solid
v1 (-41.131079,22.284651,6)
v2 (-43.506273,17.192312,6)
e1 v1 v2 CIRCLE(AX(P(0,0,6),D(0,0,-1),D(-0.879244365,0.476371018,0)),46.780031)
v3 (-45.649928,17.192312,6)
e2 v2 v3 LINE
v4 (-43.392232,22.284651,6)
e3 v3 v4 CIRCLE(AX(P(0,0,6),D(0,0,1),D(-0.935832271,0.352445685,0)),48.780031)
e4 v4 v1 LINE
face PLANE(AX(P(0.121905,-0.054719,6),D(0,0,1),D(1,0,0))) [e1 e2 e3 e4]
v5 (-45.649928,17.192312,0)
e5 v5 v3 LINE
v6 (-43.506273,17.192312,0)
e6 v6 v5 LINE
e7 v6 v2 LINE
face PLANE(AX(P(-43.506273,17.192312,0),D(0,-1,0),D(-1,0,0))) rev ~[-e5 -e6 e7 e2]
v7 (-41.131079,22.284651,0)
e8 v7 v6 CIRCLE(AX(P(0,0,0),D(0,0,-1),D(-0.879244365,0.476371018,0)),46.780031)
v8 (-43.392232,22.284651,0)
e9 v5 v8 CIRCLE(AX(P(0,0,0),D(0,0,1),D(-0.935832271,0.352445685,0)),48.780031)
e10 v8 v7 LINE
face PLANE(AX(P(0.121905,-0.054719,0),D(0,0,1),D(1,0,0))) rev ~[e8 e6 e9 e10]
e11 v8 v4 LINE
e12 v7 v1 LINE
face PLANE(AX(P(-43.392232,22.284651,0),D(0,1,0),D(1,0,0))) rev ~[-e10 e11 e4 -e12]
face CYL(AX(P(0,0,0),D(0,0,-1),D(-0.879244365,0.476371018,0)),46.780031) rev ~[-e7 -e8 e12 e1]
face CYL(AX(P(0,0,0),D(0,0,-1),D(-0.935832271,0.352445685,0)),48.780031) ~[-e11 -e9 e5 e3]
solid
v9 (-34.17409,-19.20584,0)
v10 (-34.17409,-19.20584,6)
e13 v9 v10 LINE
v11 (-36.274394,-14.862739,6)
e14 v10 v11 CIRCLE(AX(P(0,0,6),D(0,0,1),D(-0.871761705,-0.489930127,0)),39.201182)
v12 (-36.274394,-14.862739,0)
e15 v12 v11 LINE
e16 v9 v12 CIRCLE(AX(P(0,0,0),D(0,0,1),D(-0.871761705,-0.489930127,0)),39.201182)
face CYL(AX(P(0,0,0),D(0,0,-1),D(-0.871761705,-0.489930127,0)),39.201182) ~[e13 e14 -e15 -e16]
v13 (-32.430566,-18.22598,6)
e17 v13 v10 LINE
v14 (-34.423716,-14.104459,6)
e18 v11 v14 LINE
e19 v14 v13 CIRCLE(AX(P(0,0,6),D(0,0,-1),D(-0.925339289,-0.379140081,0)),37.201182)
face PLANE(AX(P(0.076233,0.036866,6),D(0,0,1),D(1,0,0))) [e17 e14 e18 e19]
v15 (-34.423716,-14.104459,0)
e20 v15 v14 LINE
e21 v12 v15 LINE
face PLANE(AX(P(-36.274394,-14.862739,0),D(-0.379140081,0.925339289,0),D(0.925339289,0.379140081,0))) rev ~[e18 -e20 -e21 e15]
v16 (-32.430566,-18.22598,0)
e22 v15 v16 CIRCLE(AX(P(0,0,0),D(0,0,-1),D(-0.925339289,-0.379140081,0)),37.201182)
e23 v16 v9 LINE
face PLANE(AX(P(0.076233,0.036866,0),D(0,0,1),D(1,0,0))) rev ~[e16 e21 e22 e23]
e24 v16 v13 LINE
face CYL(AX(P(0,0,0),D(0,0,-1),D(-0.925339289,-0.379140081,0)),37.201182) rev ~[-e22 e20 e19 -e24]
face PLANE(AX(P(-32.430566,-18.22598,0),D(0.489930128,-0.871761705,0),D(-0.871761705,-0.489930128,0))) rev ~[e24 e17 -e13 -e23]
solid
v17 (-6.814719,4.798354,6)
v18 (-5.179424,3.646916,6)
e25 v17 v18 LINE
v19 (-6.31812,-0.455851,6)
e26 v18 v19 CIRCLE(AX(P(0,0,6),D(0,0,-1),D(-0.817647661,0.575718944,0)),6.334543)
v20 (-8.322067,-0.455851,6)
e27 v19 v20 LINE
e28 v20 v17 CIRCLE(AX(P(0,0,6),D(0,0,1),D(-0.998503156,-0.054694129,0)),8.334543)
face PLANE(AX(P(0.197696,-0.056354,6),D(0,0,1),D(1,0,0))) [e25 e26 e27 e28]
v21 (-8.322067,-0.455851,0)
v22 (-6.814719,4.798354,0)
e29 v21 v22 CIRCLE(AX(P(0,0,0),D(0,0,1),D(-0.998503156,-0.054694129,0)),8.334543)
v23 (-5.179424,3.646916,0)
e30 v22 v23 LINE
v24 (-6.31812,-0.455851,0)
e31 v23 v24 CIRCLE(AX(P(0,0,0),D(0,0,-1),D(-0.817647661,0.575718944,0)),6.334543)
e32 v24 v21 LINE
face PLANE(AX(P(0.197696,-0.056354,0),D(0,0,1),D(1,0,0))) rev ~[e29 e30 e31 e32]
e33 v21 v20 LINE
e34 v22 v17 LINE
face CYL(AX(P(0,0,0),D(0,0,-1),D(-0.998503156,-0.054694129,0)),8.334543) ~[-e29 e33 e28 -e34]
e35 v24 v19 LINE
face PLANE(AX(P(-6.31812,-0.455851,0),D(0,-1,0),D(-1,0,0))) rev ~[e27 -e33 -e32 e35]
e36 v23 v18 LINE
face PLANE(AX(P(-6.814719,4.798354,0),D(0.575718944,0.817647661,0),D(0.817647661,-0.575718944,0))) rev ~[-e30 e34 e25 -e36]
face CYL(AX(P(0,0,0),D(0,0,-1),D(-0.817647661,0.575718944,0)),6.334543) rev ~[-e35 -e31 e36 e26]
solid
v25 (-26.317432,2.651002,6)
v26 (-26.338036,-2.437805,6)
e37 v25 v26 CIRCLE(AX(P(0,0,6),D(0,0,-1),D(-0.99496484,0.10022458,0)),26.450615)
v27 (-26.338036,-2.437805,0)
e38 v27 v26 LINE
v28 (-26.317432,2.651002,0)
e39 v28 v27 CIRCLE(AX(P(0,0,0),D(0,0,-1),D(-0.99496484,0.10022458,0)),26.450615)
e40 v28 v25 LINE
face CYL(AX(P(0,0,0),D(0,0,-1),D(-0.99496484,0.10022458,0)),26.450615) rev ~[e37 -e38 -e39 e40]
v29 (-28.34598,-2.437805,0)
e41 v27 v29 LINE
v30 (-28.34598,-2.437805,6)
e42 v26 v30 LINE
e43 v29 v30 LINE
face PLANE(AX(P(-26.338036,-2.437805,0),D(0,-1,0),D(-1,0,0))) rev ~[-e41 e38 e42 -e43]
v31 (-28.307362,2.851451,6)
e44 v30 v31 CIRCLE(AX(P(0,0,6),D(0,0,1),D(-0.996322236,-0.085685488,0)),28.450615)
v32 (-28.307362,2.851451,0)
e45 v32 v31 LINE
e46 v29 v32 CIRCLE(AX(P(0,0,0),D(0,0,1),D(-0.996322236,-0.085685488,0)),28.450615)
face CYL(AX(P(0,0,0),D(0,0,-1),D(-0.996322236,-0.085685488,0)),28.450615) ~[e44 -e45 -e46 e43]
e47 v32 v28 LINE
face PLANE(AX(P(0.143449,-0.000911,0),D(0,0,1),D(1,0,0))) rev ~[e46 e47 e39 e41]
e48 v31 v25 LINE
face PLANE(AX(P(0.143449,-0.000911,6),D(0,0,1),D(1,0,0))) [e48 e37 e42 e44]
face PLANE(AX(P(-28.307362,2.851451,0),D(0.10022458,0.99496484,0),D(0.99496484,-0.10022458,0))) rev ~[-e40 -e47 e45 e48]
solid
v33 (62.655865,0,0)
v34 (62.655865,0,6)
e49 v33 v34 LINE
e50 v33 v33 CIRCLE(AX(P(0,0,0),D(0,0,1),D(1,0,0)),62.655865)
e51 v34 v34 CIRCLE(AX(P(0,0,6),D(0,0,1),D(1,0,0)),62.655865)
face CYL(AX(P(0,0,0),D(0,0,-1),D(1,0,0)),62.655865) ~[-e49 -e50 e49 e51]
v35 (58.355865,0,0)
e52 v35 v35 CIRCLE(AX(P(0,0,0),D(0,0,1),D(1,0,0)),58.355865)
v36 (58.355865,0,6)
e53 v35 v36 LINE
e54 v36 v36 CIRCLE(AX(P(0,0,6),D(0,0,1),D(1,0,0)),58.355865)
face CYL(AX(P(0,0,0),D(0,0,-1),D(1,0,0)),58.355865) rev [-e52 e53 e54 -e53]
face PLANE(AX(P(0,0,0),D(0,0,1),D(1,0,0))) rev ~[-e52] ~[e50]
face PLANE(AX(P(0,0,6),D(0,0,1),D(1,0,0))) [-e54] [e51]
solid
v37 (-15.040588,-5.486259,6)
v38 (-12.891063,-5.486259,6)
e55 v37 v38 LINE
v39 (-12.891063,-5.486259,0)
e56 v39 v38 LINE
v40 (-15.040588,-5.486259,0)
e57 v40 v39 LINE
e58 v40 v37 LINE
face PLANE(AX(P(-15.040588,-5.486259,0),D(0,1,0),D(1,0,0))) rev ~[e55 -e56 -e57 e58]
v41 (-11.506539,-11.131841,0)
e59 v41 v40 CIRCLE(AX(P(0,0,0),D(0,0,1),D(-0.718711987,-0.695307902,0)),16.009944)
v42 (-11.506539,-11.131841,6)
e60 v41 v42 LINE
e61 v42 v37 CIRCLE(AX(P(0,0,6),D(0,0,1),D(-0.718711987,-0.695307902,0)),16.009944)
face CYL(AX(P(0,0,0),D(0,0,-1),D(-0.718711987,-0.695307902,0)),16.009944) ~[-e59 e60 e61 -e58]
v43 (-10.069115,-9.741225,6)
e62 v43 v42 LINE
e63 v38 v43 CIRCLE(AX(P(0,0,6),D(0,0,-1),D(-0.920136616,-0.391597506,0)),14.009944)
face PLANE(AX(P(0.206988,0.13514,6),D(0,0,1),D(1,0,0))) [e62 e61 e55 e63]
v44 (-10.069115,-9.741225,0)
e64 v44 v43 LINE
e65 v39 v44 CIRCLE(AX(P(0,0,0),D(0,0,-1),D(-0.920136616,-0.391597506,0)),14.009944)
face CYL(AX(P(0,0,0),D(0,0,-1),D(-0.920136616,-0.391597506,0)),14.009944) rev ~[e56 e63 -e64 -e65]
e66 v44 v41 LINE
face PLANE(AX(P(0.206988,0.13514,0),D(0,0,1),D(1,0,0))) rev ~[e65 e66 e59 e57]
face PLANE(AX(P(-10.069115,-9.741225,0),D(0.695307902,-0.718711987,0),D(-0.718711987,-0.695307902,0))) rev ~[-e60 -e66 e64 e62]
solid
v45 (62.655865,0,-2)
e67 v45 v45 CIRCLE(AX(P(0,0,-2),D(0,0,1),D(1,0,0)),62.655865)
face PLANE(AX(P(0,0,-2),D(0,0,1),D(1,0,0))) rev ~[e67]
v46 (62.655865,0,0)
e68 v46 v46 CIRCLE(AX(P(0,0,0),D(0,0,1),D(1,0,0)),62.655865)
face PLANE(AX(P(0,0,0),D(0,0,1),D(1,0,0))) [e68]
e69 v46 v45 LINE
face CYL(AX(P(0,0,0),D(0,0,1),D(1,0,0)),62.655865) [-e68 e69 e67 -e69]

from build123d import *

# Parameters (mm, degrees)
F1_DEPTH = 6
F0_R     = 62.6558654543
F0_R_2   = 58.3558654543
F2_R     = 62.6558654543
F3_DEPTH = 2


with BuildPart() as f1:
    # F0 (on Top) → F1 (new body)
    with BuildSketch(Plane.XY):
        with BuildLine():
            Line((-43.5062726708, 17.1923115849), (-45.6499275725, 17.1923115849))
            ThreePointArc((-45.6499275725, 17.1923115849), (44.5938282764, -19.7707345503), (-43.392231874, 22.2846511751))
            Line((-43.392231874, 22.2846511751), (-41.1310790199, 22.2846511751))
            ThreePointArc((-41.1310790199, 22.2846511751), (42.3952038081, -19.7741759224), (-43.5062726708, 17.1923115849))
        make_face()
    extrude(amount=F1_DEPTH)


with BuildPart() as f1b:
    # F0 (on Top) → F1, piece 2 (new body)
    with BuildSketch(Plane.XY):
        Circle(F0_R)
        Circle(F0_R_2, mode=Mode.SUBTRACT)
    extrude(amount=F1_DEPTH)


with BuildPart() as f1c:
    # F0 (on Top) → F1, piece 3 (new body)
    with BuildSketch(Plane.XY):
        with BuildLine():
            Line((-32.4305662193, -18.2259800495), (-34.1740896291, -19.2058403045))
            ThreePointArc((-34.1740896291, -19.2058403045), (35.2911157623, 17.0666297797), (-36.2743942596, -14.862739481))
            Line((-36.2743942596, -14.862739481), (-34.4237156824, -14.104459319))
            ThreePointArc((-34.4237156824, -14.104459319), (33.4906029422, 16.1959096267), (-32.4305662193, -18.2259800495))
        make_face()
    extrude(amount=F1_DEPTH)


with BuildPart() as f1d:
    # F0 (on Top) → F1, piece 4 (new body)
    with BuildSketch(Plane.XY):
        with BuildLine():
            Line((-26.3380359585, -2.4378048256), (-28.3459802776, -2.4378048256))
            ThreePointArc((-28.3459802776, -2.4378048256), (28.4498566189, -0.2077224752), (-28.3073615488, 2.851450931))
            Line((-28.3073615488, 2.851450931), (-26.317431868, 2.6510017711))
            ThreePointArc((-26.317431868, 2.6510017711), (26.4503981284, -0.1070951284), (-26.3380359585, -2.4378048256))
        make_face()
    extrude(amount=F1_DEPTH)


with BuildPart() as f1e:
    # F0 (on Top) → F1, piece 5 (new body)
    with BuildSketch(Plane.XY):
        with BuildLine():
            Line((-10.069114881, -9.7412249533), (-11.5065388559, -11.131840758))
            ThreePointArc((-11.5065388559, -11.131840758), (13.5703952835, 8.4948623858), (-15.0405875779, -5.4862592369))
            Line((-15.0405875779, -5.4862592369), (-12.8910627049, -5.4862592369))
            ThreePointArc((-12.8910627049, -5.4862592369), (11.6755566037, 7.7433788537), (-10.069114881, -9.7412249533))
        make_face()
    extrude(amount=F1_DEPTH)


with BuildPart() as f1f:
    # F0 (on Top) → F1, piece 6 (new body)
    with BuildSketch(Plane.XY):
        with BuildLine():
            ThreePointArc((-5.1794242353, 3.646916388), (6.1038145867, -1.6940726198), (-6.3181195634, -0.4558505607))
            Line((-6.3181195634, -0.4558505607), (-8.3220673289, -0.4558505607))
            ThreePointArc((-8.3220673289, -0.4558505607), (8.0113822453, -2.2983382867), (-6.8147194565, 4.7983542063))
            Line((-6.8147194565, 4.7983542063), (-5.1794242353, 3.646916388))
        make_face()
    extrude(amount=F1_DEPTH)


with BuildPart() as f3:
    # F2 (on Top) → F3 (new body)
    with BuildSketch(Plane.XY):
        Circle(F2_R)
    extrude(amount=-F3_DEPTH)


solid = Compound([f1.part, f1b.part, f1c.part, f1d.part, f1e.part, f1f.part, f3.part])
